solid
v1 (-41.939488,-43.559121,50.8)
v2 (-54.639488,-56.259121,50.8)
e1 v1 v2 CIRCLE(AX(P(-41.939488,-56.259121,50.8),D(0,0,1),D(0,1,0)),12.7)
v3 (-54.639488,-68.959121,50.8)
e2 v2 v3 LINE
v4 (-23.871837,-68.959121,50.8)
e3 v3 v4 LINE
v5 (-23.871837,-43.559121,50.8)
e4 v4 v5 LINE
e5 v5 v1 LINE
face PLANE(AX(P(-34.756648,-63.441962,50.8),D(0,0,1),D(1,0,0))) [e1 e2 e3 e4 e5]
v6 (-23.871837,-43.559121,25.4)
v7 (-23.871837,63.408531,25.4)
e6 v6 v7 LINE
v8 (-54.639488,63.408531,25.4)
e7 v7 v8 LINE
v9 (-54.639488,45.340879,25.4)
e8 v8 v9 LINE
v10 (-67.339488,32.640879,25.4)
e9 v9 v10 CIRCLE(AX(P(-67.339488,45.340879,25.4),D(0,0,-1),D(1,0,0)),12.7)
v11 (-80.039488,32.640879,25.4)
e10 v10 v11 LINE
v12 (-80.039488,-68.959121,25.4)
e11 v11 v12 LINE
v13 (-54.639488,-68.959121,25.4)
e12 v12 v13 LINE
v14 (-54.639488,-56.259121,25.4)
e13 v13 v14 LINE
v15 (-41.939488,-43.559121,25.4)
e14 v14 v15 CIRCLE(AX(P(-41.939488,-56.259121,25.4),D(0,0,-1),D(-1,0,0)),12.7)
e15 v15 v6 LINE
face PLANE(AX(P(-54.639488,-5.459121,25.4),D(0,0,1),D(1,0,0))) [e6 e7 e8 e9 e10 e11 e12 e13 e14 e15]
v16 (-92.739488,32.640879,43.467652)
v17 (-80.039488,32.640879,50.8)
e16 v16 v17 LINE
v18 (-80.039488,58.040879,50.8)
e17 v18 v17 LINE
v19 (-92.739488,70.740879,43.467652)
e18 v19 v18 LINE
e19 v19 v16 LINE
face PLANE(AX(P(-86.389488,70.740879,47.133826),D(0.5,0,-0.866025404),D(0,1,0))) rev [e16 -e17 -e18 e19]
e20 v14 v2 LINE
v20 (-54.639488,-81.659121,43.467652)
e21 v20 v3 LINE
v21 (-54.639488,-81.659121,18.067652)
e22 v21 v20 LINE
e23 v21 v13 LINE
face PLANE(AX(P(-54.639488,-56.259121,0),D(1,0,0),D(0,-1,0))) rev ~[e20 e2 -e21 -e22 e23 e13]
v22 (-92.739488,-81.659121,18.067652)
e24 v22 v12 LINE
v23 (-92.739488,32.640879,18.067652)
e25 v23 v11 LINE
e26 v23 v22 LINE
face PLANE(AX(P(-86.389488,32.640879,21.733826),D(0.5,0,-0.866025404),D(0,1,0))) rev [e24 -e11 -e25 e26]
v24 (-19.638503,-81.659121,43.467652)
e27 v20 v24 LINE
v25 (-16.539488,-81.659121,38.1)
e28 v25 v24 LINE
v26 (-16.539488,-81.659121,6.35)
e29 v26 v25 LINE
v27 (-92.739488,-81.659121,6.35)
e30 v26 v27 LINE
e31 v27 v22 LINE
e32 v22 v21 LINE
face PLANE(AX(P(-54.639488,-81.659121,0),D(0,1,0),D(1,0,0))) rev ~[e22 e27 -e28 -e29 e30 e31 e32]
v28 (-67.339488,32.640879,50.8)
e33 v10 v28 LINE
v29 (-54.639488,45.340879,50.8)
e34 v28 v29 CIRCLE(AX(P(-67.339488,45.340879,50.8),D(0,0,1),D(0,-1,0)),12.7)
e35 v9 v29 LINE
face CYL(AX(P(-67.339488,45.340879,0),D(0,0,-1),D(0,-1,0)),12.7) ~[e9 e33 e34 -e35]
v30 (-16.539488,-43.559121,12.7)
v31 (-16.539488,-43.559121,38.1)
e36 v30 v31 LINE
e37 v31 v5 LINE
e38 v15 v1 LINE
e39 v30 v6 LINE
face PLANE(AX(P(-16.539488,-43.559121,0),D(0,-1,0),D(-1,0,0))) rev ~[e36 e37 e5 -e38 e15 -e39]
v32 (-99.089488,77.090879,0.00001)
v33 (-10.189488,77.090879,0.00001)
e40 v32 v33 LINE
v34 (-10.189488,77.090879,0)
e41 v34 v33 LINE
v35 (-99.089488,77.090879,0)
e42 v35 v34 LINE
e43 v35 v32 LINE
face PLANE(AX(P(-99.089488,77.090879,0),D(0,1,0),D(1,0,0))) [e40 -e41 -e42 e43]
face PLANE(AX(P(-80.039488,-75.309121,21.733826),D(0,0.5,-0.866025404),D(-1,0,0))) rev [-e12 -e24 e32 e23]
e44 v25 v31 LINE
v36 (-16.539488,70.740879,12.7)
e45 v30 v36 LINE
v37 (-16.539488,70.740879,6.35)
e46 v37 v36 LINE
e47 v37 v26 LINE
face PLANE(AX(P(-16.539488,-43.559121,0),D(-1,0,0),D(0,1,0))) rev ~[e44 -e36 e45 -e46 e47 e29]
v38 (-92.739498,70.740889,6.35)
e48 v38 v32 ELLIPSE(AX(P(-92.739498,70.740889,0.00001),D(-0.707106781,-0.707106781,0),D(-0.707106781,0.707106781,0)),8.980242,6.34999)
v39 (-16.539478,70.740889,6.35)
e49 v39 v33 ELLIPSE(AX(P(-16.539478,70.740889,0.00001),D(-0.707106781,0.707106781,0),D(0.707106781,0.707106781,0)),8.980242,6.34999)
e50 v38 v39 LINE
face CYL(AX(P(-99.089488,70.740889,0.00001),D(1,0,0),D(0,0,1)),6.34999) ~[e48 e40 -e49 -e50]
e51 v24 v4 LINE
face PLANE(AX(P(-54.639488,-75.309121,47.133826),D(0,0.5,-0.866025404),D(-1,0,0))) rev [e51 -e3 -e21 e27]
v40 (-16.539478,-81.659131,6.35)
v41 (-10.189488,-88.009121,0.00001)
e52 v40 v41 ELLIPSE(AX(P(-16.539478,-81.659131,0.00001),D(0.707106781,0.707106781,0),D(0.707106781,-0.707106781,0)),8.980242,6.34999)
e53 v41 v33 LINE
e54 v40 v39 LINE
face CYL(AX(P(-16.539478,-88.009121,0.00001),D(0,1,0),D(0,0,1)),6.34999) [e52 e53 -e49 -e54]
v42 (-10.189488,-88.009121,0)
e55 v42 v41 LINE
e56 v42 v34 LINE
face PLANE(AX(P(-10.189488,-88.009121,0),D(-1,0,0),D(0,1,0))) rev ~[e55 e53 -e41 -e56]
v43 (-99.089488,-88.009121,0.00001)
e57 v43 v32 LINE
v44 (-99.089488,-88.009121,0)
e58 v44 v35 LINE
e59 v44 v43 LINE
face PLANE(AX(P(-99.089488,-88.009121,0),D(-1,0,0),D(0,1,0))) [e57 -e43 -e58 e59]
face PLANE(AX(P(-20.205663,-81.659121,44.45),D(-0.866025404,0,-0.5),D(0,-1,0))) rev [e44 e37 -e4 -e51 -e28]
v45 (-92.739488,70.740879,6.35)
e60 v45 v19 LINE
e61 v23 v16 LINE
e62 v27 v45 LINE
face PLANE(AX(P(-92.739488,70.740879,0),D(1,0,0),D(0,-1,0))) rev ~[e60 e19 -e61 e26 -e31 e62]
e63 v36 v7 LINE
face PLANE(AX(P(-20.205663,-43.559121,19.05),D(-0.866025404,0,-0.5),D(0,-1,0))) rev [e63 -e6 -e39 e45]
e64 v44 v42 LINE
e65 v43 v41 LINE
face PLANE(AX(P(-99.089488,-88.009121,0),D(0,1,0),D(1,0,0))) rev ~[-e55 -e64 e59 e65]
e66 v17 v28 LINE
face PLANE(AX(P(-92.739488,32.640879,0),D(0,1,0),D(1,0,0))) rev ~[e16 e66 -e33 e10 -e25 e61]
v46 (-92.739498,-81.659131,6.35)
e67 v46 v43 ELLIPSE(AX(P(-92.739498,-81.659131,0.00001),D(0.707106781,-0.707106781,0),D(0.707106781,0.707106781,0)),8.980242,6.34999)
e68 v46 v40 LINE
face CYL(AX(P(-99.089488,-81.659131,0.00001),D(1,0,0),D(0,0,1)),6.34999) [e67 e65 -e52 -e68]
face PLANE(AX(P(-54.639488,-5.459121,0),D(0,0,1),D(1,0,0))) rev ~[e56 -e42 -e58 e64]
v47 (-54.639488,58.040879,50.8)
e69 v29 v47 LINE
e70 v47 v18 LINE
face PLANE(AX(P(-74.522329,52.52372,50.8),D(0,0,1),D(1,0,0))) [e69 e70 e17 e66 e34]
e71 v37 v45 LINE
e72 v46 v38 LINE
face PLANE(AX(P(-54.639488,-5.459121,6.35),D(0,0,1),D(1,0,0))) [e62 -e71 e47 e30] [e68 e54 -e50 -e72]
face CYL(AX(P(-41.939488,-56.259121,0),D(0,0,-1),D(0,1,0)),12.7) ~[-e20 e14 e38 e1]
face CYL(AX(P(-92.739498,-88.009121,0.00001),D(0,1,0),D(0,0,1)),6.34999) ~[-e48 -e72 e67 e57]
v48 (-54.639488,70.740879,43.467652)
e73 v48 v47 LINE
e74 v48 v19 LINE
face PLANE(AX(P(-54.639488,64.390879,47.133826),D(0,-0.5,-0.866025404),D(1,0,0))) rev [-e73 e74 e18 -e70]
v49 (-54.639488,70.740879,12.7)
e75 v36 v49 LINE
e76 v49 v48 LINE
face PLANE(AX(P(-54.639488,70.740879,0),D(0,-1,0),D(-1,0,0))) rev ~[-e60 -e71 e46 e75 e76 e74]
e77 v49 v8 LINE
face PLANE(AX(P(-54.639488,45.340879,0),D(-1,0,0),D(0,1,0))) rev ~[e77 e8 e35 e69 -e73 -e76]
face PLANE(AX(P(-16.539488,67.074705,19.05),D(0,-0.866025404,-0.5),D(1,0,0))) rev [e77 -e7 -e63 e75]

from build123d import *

# Parameters (mm, degrees)
F0_W        = 88.9
F0_H        = 165.1
F1_DEPTH    = 6.35
F2_DEPTH    = 25.4
F3_DEPTH    = 50.8
F4_R        = 6.34999
F5_C1_SIZE2 = 12.7
F5_C1_SIZE  = 7.3323484187
F5_C2_SIZE2 = 12.7
F5_C2_SIZE  = 7.3323484187
F5_C3_SIZE2 = 7.3323484187
F5_C3_SIZE  = 12.7
F5_C4_SIZE2 = 12.7
F5_C4_SIZE  = 7.3323484187
F5_C5_SIZE2 = 7.3323484187
F5_C5_SIZE  = 12.7
F5_C6_SIZE2 = 7.3323484187
F5_C6_SIZE  = 12.7
F5_C7_SIZE2 = 12.7
F5_C7_SIZE  = 7.3323484187
F5_C8_SIZE2 = 12.7
F5_C8_SIZE  = 7.3323484187


# Not quite as in the source:
# - a fillet or chamfer is up to 0.001 mm smaller than in the source, because OpenCascade refuses the exact size


with BuildPart() as f1:
    # F0 (on Top) → F1 (new body)
    with BuildSketch(Plane.XY):
        with Locations((-54.6394883871, -5.459120968)):
            Rectangle(F0_W, F0_H)
        Polygon((-92.7394883871, 32.640879032), (-92.7394883871, 70.740879032), (-54.6394883871, 70.740879032), (-16.5394883871, 70.740879032), (-16.5394883871, -43.559120968), (-16.5394883871, -81.659120968), (-54.6394883871, -81.659120968), (-92.7394883871, -81.659120968), align=None, mode=Mode.SUBTRACT)
    extrude(amount=F1_DEPTH)

    # F0 (on Top) → F2 (join)
    with BuildSketch(Plane.XY):
        with BuildLine():
            Line((-16.5394883871, 70.740879032), (-54.6394883871, 70.740879032))
            Line((-54.6394883871, 70.740879032), (-54.6394883871, 45.340879032))
            ThreePointArc((-54.6394883871, 45.340879032), (-58.359232266, 36.3606229109), (-67.3394883871, 32.640879032))
            Line((-67.3394883871, 32.640879032), (-92.7394883871, 32.640879032))
            Line((-92.7394883871, 32.640879032), (-92.7394883871, -81.659120968))
            Line((-92.7394883871, -81.659120968), (-54.6394883871, -81.659120968))
            Line((-54.6394883871, -81.659120968), (-54.6394883871, -56.259120968))
            ThreePointArc((-54.6394883871, -56.259120968), (-50.9197445082, -47.2788648469), (-41.9394883871, -43.559120968))
            Line((-41.9394883871, -43.559120968), (-16.5394883871, -43.559120968))
            Line((-16.5394883871, -43.559120968), (-16.5394883871, 70.740879032))
        make_face()
    extrude(amount=F2_DEPTH)

    # F0 (on Top) → F3 (join)
    with BuildSketch(Plane.XY):
        with BuildLine():
            Line((-54.6394883871, 70.740879032), (-92.7394883871, 70.740879032))
            Line((-92.7394883871, 70.740879032), (-92.7394883871, 32.640879032))
            Line((-92.7394883871, 32.640879032), (-67.3394883871, 32.640879032))
            ThreePointArc((-67.3394883871, 32.640879032), (-58.359232266, 36.3606229109), (-54.6394883871, 45.340879032))
            Line((-54.6394883871, 45.340879032), (-54.6394883871, 70.740879032))
        make_face()
        with BuildLine():
            Line((-16.5394883871, -81.659120968), (-16.5394883871, -43.559120968))
            Line((-16.5394883871, -43.559120968), (-41.9394883871, -43.559120968))
            ThreePointArc((-41.9394883871, -43.559120968), (-50.9197445082, -47.2788648469), (-54.6394883871, -56.259120968))
            Line((-54.6394883871, -56.259120968), (-54.6394883871, -81.659120968))
            Line((-54.6394883871, -81.659120968), (-16.5394883871, -81.659120968))
        make_face()
    extrude(amount=F3_DEPTH)

    # F4 (radius 6.35 in the source; OpenCascade refuses exactly that, so slightly less here)
    f4_edges = [f1.edges().sort_by_distance(p)[0] for p in [
        (-99.089488, -5.459121, 6.35),
        (-54.639488, -88.009121, 6.35),
        (-10.189488, -5.459121, 6.35),
        (-54.639488, 77.090879, 6.35),
    ]]
    fillet(f4_edges, radius=F4_R)

    # F5: chamfer of 12.7 x 7.3323484187 on 8 edges, made by hand

    # F5_c1
    f5_c1_edges = [f1.edges().sort_by_distance(p)[0] for p in [
        (-92.7394883871, 51.690879032, 50.8),
    ]]
    f5_c1_side = f1.faces().sort_by_distance((-92.7394883871, 51.690879032, 50.6533530316))[0]
    chamfer(f5_c1_edges, length=F5_C1_SIZE, length2=F5_C1_SIZE2, reference=f5_c1_side)

    # F5_c2
    f5_c2_edges = [f1.edges().sort_by_distance(p)[0] for p in [
        (-92.7394883871, -24.509120968, 25.4),
    ]]
    f5_c2_side = f1.faces().sort_by_distance((-92.7394883871, -24.509120968, 25.2533530316))[0]
    chamfer(f5_c2_edges, length=F5_C2_SIZE, length2=F5_C2_SIZE2, reference=f5_c2_side)

    # F5_c3
    f5_c3_edges = [f1.edges().sort_by_distance(p)[0] for p in [
        (-35.5894883871, 70.740879032, 25.4),
    ]]
    f5_c3_side = f1.faces().sort_by_distance((-35.5894883871, 70.740879032, 25.2533530316))[0]
    chamfer(f5_c3_edges, length=F5_C3_SIZE, length2=F5_C3_SIZE2, reference=f5_c3_side)

    # F5_c4
    f5_c4_edges = [f1.edges().sort_by_distance(p)[0] for p in [
        (-67.3394883871, 70.740879032, 50.8),
    ]]
    f5_c4_side = f1.faces().sort_by_distance((-67.3394883871, 70.740879032, 50.6533530316))[0]
    chamfer(f5_c4_edges, length=F5_C4_SIZE, length2=F5_C4_SIZE2, reference=f5_c4_side)

    # F5_c5
    f5_c5_edges = [f1.edges().sort_by_distance(p)[0] for p in [
        (-16.5394883871, -62.609120968, 50.8),
    ]]
    f5_c5_side = f1.faces().sort_by_distance((-16.5394883871, -62.609120968, 50.6533530316))[0]
    chamfer(f5_c5_edges, length=F5_C5_SIZE, length2=F5_C5_SIZE2, reference=f5_c5_side)

    # F5_c6
    f5_c6_edges = [f1.edges().sort_by_distance(p)[0] for p in [
        (-16.5394883871, 9.9247048227, 25.4),
    ]]
    f5_c6_side = f1.faces().sort_by_distance((-16.5394883871, 9.9247048227, 25.2533530316))[0]
    chamfer(f5_c6_edges, length=F5_C6_SIZE, length2=F5_C6_SIZE2, reference=f5_c6_side)

    # F5_c7
    f5_c7_edges = [f1.edges().sort_by_distance(p)[0] for p in [
        (-67.3394883871, -81.659120968, 25.4),
    ]]
    f5_c7_side = f1.faces().sort_by_distance((-67.3394883871, -81.659120968, 25.2533530316))[0]
    chamfer(f5_c7_edges, length=F5_C7_SIZE, length2=F5_C7_SIZE2, reference=f5_c7_side)

    # F5_c8
    f5_c8_edges = [f1.edges().sort_by_distance(p)[0] for p in [
        (-39.2556625965, -81.659120968, 50.8),
    ]]
    f5_c8_side = f1.faces().sort_by_distance((-39.2556625965, -81.659120968, 50.6533530316))[0]
    chamfer(f5_c8_edges, length=F5_C8_SIZE, length2=F5_C8_SIZE2, reference=f5_c8_side)


solid = f1.part
